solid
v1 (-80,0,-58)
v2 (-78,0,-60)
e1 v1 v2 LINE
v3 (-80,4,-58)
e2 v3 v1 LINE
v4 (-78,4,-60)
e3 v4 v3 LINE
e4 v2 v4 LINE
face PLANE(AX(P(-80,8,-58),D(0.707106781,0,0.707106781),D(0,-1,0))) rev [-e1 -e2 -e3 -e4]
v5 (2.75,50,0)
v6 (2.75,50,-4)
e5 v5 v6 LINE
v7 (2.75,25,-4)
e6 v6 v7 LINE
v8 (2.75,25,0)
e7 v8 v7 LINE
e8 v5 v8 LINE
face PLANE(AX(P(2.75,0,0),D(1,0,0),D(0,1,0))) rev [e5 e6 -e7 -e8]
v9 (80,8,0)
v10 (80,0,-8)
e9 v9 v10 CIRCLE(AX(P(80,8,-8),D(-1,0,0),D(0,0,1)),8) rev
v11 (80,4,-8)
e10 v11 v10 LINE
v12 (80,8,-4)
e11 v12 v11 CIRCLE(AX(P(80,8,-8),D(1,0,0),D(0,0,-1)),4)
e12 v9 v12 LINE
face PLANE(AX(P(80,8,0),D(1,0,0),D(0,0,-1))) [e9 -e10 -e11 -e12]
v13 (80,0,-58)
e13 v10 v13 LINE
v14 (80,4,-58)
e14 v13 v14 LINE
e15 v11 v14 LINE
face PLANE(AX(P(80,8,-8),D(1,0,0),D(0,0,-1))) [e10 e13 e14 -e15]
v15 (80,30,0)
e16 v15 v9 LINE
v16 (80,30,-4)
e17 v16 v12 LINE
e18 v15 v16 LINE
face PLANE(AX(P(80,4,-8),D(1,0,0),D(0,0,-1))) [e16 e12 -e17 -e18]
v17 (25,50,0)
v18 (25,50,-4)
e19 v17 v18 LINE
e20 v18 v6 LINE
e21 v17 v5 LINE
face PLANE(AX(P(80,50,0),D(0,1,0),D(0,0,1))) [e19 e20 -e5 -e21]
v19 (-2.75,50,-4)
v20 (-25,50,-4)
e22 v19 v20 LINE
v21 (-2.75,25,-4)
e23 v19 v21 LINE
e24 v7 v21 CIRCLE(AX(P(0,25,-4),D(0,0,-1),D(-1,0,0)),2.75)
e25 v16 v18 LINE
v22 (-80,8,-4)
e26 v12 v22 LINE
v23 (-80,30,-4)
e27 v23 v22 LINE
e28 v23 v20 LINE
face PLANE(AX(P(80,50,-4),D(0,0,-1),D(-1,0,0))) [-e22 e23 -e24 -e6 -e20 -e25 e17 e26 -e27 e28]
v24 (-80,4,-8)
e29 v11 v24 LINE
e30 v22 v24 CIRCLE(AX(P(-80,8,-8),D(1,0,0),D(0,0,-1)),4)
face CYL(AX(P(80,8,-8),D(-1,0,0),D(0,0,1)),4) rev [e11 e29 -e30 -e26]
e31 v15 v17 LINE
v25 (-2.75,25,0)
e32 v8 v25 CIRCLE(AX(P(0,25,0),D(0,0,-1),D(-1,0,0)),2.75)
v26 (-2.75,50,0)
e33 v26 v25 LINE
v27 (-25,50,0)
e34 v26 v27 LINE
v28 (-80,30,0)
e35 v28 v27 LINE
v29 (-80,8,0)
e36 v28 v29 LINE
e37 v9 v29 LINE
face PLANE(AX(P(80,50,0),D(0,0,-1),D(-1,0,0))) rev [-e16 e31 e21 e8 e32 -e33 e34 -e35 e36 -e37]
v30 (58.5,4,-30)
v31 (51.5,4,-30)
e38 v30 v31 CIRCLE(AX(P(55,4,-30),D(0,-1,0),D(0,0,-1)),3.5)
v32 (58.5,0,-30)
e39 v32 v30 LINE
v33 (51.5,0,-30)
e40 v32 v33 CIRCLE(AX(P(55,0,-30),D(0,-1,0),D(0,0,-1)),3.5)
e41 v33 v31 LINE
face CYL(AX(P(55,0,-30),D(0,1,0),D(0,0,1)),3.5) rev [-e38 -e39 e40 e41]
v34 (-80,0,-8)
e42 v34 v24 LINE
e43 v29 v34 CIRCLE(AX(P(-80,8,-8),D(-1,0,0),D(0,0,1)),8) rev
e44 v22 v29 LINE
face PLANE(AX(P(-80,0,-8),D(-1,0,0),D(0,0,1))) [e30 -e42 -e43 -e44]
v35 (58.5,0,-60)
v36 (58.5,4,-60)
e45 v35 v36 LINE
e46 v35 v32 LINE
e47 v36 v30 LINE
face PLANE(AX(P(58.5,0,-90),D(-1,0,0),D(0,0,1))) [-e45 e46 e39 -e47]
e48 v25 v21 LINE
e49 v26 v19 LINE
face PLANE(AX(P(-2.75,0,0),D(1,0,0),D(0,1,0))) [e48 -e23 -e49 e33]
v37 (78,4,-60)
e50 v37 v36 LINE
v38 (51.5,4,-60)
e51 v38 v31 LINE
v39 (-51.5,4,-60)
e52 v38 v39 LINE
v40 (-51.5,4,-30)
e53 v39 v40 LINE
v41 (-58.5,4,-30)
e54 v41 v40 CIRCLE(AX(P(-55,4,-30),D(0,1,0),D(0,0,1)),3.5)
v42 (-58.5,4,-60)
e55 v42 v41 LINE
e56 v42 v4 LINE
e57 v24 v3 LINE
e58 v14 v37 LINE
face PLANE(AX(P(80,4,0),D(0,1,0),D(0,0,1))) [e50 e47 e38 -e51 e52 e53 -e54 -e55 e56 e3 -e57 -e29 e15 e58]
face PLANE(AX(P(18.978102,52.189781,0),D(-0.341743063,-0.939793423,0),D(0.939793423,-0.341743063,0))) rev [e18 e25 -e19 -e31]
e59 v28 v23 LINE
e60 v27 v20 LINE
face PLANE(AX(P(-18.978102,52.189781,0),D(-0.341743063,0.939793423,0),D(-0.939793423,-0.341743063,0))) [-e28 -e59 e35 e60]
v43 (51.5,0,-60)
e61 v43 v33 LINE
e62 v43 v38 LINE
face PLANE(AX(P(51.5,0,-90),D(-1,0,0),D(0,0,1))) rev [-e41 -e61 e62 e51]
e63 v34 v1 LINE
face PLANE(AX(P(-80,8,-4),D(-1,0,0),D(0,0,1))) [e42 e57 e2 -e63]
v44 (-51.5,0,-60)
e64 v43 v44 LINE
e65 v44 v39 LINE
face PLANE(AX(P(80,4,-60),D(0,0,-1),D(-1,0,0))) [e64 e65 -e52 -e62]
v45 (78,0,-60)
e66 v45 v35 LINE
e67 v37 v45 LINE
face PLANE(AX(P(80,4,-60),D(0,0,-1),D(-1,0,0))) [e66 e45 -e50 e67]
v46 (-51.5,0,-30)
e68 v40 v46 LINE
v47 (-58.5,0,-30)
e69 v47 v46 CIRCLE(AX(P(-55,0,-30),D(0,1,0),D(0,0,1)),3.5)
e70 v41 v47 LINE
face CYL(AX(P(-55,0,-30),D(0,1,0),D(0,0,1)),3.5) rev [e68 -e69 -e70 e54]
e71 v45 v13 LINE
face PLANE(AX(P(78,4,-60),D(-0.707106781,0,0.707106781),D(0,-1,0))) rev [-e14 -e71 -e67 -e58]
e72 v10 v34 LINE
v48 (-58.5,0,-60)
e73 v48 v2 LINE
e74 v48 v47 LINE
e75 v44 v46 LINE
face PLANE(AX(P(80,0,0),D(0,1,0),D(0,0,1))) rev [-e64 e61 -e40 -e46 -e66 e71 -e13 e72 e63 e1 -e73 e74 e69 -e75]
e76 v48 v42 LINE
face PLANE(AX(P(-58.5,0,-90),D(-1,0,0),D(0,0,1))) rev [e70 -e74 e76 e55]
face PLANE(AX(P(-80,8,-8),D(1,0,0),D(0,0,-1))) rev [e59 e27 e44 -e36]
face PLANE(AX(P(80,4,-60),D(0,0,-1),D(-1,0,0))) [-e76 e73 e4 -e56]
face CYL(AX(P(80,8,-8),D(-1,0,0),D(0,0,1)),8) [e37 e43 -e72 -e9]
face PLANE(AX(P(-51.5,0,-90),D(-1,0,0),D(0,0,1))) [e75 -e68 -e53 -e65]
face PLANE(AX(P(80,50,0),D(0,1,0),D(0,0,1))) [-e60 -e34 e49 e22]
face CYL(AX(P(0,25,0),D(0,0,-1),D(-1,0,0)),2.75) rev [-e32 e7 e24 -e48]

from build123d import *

# Parameters (mm, degrees)
BASE_FLANGE1_DEPTH = 80
CUT_EXTRUDE1_DEPTH = 110.708705215
SKETCH8_R          = 3.5
SKETCH8_W          = 7
SKETCH8_H          = 60
CUT_EXTRUDE2_DEPTH = 111.072703247
CHAMFER1_SIZE      = 2


# Sheet-metal steps are written as plain solids
with BuildPart() as part:
    # Sketch1 → Base-Flange1 (new, symmetric)
    with BuildSketch(Plane(origin=(0, 0, 0), x_dir=(0, 0, -1), z_dir=(1, 0, 0))):
        with BuildLine():
            Line((0, 50), (0, 8))
            ThreePointArc((0, 8), (2.343145751, 2.343145751), (8, 0))
            Line((8, 0), (60, 0))
            Line((60, 0), (60, 4))
            Line((60, 4), (8, 4))
            ThreePointArc((8, 4), (5.171572875, 5.171572875), (4, 8))
            Line((4, 8), (4, 50))
            Line((4, 50), (0, 50))
        make_face()
    extrude(amount=BASE_FLANGE1_DEPTH, both=True)

    # Sketch7 → Cut-Extrude1 (cut, through all)
    with BuildSketch(Plane(origin=(0, 0, -4), x_dir=(-1, 0, 0), z_dir=(0, 0, -1))):
        with BuildLine():
            Line((2.75, 50), (-2.75, 50))
            Line((-2.75, 50), (-2.75, 25))
            ThreePointArc((-2.75, 25), (0, 27.75), (2.75, 25))
            Line((2.75, 25), (2.75, 50))
        make_face()
        with BuildLine():
            ThreePointArc((2.75, 25), (0, 27.75), (-2.75, 25))
            Line((-2.75, 25), (2.75, 25))
        make_face()
        with BuildLine():
            Line((2.75, 25), (-2.75, 25))
            ThreePointArc((-2.75, 25), (0, 22.25), (2.75, 25))
        make_face()
        Polygon((-80, 30), (-25, 50), (-80, 50), align=None)
        Polygon((80, 50), (25, 50), (80, 30), align=None)
    extrude(amount=-CUT_EXTRUDE1_DEPTH, mode=Mode.SUBTRACT)

    # Sketch8 → Cut-Extrude2 (cut, through all)
    with BuildSketch(Plane(origin=(0, 4, 0), x_dir=(1, 0, 0), z_dir=(0, 1, 0))):
        with Locations((-55, 30)):
            Circle(SKETCH8_R)
        with Locations((55, 30)):
            Circle(SKETCH8_R)
        with Locations((-55, 60)):
            Rectangle(SKETCH8_W, SKETCH8_H)
        with Locations((55, 60)):
            Rectangle(SKETCH8_W, SKETCH8_H)
    extrude(amount=-CUT_EXTRUDE2_DEPTH, mode=Mode.SUBTRACT)

    # Chamfer1
    chamfer1_edges = [part.edges().sort_by_distance(p)[0] for p in [
        (80, 2, -60),
        (-80, 2, -60),
    ]]
    chamfer(chamfer1_edges, length=CHAMFER1_SIZE)


solid = part.part
